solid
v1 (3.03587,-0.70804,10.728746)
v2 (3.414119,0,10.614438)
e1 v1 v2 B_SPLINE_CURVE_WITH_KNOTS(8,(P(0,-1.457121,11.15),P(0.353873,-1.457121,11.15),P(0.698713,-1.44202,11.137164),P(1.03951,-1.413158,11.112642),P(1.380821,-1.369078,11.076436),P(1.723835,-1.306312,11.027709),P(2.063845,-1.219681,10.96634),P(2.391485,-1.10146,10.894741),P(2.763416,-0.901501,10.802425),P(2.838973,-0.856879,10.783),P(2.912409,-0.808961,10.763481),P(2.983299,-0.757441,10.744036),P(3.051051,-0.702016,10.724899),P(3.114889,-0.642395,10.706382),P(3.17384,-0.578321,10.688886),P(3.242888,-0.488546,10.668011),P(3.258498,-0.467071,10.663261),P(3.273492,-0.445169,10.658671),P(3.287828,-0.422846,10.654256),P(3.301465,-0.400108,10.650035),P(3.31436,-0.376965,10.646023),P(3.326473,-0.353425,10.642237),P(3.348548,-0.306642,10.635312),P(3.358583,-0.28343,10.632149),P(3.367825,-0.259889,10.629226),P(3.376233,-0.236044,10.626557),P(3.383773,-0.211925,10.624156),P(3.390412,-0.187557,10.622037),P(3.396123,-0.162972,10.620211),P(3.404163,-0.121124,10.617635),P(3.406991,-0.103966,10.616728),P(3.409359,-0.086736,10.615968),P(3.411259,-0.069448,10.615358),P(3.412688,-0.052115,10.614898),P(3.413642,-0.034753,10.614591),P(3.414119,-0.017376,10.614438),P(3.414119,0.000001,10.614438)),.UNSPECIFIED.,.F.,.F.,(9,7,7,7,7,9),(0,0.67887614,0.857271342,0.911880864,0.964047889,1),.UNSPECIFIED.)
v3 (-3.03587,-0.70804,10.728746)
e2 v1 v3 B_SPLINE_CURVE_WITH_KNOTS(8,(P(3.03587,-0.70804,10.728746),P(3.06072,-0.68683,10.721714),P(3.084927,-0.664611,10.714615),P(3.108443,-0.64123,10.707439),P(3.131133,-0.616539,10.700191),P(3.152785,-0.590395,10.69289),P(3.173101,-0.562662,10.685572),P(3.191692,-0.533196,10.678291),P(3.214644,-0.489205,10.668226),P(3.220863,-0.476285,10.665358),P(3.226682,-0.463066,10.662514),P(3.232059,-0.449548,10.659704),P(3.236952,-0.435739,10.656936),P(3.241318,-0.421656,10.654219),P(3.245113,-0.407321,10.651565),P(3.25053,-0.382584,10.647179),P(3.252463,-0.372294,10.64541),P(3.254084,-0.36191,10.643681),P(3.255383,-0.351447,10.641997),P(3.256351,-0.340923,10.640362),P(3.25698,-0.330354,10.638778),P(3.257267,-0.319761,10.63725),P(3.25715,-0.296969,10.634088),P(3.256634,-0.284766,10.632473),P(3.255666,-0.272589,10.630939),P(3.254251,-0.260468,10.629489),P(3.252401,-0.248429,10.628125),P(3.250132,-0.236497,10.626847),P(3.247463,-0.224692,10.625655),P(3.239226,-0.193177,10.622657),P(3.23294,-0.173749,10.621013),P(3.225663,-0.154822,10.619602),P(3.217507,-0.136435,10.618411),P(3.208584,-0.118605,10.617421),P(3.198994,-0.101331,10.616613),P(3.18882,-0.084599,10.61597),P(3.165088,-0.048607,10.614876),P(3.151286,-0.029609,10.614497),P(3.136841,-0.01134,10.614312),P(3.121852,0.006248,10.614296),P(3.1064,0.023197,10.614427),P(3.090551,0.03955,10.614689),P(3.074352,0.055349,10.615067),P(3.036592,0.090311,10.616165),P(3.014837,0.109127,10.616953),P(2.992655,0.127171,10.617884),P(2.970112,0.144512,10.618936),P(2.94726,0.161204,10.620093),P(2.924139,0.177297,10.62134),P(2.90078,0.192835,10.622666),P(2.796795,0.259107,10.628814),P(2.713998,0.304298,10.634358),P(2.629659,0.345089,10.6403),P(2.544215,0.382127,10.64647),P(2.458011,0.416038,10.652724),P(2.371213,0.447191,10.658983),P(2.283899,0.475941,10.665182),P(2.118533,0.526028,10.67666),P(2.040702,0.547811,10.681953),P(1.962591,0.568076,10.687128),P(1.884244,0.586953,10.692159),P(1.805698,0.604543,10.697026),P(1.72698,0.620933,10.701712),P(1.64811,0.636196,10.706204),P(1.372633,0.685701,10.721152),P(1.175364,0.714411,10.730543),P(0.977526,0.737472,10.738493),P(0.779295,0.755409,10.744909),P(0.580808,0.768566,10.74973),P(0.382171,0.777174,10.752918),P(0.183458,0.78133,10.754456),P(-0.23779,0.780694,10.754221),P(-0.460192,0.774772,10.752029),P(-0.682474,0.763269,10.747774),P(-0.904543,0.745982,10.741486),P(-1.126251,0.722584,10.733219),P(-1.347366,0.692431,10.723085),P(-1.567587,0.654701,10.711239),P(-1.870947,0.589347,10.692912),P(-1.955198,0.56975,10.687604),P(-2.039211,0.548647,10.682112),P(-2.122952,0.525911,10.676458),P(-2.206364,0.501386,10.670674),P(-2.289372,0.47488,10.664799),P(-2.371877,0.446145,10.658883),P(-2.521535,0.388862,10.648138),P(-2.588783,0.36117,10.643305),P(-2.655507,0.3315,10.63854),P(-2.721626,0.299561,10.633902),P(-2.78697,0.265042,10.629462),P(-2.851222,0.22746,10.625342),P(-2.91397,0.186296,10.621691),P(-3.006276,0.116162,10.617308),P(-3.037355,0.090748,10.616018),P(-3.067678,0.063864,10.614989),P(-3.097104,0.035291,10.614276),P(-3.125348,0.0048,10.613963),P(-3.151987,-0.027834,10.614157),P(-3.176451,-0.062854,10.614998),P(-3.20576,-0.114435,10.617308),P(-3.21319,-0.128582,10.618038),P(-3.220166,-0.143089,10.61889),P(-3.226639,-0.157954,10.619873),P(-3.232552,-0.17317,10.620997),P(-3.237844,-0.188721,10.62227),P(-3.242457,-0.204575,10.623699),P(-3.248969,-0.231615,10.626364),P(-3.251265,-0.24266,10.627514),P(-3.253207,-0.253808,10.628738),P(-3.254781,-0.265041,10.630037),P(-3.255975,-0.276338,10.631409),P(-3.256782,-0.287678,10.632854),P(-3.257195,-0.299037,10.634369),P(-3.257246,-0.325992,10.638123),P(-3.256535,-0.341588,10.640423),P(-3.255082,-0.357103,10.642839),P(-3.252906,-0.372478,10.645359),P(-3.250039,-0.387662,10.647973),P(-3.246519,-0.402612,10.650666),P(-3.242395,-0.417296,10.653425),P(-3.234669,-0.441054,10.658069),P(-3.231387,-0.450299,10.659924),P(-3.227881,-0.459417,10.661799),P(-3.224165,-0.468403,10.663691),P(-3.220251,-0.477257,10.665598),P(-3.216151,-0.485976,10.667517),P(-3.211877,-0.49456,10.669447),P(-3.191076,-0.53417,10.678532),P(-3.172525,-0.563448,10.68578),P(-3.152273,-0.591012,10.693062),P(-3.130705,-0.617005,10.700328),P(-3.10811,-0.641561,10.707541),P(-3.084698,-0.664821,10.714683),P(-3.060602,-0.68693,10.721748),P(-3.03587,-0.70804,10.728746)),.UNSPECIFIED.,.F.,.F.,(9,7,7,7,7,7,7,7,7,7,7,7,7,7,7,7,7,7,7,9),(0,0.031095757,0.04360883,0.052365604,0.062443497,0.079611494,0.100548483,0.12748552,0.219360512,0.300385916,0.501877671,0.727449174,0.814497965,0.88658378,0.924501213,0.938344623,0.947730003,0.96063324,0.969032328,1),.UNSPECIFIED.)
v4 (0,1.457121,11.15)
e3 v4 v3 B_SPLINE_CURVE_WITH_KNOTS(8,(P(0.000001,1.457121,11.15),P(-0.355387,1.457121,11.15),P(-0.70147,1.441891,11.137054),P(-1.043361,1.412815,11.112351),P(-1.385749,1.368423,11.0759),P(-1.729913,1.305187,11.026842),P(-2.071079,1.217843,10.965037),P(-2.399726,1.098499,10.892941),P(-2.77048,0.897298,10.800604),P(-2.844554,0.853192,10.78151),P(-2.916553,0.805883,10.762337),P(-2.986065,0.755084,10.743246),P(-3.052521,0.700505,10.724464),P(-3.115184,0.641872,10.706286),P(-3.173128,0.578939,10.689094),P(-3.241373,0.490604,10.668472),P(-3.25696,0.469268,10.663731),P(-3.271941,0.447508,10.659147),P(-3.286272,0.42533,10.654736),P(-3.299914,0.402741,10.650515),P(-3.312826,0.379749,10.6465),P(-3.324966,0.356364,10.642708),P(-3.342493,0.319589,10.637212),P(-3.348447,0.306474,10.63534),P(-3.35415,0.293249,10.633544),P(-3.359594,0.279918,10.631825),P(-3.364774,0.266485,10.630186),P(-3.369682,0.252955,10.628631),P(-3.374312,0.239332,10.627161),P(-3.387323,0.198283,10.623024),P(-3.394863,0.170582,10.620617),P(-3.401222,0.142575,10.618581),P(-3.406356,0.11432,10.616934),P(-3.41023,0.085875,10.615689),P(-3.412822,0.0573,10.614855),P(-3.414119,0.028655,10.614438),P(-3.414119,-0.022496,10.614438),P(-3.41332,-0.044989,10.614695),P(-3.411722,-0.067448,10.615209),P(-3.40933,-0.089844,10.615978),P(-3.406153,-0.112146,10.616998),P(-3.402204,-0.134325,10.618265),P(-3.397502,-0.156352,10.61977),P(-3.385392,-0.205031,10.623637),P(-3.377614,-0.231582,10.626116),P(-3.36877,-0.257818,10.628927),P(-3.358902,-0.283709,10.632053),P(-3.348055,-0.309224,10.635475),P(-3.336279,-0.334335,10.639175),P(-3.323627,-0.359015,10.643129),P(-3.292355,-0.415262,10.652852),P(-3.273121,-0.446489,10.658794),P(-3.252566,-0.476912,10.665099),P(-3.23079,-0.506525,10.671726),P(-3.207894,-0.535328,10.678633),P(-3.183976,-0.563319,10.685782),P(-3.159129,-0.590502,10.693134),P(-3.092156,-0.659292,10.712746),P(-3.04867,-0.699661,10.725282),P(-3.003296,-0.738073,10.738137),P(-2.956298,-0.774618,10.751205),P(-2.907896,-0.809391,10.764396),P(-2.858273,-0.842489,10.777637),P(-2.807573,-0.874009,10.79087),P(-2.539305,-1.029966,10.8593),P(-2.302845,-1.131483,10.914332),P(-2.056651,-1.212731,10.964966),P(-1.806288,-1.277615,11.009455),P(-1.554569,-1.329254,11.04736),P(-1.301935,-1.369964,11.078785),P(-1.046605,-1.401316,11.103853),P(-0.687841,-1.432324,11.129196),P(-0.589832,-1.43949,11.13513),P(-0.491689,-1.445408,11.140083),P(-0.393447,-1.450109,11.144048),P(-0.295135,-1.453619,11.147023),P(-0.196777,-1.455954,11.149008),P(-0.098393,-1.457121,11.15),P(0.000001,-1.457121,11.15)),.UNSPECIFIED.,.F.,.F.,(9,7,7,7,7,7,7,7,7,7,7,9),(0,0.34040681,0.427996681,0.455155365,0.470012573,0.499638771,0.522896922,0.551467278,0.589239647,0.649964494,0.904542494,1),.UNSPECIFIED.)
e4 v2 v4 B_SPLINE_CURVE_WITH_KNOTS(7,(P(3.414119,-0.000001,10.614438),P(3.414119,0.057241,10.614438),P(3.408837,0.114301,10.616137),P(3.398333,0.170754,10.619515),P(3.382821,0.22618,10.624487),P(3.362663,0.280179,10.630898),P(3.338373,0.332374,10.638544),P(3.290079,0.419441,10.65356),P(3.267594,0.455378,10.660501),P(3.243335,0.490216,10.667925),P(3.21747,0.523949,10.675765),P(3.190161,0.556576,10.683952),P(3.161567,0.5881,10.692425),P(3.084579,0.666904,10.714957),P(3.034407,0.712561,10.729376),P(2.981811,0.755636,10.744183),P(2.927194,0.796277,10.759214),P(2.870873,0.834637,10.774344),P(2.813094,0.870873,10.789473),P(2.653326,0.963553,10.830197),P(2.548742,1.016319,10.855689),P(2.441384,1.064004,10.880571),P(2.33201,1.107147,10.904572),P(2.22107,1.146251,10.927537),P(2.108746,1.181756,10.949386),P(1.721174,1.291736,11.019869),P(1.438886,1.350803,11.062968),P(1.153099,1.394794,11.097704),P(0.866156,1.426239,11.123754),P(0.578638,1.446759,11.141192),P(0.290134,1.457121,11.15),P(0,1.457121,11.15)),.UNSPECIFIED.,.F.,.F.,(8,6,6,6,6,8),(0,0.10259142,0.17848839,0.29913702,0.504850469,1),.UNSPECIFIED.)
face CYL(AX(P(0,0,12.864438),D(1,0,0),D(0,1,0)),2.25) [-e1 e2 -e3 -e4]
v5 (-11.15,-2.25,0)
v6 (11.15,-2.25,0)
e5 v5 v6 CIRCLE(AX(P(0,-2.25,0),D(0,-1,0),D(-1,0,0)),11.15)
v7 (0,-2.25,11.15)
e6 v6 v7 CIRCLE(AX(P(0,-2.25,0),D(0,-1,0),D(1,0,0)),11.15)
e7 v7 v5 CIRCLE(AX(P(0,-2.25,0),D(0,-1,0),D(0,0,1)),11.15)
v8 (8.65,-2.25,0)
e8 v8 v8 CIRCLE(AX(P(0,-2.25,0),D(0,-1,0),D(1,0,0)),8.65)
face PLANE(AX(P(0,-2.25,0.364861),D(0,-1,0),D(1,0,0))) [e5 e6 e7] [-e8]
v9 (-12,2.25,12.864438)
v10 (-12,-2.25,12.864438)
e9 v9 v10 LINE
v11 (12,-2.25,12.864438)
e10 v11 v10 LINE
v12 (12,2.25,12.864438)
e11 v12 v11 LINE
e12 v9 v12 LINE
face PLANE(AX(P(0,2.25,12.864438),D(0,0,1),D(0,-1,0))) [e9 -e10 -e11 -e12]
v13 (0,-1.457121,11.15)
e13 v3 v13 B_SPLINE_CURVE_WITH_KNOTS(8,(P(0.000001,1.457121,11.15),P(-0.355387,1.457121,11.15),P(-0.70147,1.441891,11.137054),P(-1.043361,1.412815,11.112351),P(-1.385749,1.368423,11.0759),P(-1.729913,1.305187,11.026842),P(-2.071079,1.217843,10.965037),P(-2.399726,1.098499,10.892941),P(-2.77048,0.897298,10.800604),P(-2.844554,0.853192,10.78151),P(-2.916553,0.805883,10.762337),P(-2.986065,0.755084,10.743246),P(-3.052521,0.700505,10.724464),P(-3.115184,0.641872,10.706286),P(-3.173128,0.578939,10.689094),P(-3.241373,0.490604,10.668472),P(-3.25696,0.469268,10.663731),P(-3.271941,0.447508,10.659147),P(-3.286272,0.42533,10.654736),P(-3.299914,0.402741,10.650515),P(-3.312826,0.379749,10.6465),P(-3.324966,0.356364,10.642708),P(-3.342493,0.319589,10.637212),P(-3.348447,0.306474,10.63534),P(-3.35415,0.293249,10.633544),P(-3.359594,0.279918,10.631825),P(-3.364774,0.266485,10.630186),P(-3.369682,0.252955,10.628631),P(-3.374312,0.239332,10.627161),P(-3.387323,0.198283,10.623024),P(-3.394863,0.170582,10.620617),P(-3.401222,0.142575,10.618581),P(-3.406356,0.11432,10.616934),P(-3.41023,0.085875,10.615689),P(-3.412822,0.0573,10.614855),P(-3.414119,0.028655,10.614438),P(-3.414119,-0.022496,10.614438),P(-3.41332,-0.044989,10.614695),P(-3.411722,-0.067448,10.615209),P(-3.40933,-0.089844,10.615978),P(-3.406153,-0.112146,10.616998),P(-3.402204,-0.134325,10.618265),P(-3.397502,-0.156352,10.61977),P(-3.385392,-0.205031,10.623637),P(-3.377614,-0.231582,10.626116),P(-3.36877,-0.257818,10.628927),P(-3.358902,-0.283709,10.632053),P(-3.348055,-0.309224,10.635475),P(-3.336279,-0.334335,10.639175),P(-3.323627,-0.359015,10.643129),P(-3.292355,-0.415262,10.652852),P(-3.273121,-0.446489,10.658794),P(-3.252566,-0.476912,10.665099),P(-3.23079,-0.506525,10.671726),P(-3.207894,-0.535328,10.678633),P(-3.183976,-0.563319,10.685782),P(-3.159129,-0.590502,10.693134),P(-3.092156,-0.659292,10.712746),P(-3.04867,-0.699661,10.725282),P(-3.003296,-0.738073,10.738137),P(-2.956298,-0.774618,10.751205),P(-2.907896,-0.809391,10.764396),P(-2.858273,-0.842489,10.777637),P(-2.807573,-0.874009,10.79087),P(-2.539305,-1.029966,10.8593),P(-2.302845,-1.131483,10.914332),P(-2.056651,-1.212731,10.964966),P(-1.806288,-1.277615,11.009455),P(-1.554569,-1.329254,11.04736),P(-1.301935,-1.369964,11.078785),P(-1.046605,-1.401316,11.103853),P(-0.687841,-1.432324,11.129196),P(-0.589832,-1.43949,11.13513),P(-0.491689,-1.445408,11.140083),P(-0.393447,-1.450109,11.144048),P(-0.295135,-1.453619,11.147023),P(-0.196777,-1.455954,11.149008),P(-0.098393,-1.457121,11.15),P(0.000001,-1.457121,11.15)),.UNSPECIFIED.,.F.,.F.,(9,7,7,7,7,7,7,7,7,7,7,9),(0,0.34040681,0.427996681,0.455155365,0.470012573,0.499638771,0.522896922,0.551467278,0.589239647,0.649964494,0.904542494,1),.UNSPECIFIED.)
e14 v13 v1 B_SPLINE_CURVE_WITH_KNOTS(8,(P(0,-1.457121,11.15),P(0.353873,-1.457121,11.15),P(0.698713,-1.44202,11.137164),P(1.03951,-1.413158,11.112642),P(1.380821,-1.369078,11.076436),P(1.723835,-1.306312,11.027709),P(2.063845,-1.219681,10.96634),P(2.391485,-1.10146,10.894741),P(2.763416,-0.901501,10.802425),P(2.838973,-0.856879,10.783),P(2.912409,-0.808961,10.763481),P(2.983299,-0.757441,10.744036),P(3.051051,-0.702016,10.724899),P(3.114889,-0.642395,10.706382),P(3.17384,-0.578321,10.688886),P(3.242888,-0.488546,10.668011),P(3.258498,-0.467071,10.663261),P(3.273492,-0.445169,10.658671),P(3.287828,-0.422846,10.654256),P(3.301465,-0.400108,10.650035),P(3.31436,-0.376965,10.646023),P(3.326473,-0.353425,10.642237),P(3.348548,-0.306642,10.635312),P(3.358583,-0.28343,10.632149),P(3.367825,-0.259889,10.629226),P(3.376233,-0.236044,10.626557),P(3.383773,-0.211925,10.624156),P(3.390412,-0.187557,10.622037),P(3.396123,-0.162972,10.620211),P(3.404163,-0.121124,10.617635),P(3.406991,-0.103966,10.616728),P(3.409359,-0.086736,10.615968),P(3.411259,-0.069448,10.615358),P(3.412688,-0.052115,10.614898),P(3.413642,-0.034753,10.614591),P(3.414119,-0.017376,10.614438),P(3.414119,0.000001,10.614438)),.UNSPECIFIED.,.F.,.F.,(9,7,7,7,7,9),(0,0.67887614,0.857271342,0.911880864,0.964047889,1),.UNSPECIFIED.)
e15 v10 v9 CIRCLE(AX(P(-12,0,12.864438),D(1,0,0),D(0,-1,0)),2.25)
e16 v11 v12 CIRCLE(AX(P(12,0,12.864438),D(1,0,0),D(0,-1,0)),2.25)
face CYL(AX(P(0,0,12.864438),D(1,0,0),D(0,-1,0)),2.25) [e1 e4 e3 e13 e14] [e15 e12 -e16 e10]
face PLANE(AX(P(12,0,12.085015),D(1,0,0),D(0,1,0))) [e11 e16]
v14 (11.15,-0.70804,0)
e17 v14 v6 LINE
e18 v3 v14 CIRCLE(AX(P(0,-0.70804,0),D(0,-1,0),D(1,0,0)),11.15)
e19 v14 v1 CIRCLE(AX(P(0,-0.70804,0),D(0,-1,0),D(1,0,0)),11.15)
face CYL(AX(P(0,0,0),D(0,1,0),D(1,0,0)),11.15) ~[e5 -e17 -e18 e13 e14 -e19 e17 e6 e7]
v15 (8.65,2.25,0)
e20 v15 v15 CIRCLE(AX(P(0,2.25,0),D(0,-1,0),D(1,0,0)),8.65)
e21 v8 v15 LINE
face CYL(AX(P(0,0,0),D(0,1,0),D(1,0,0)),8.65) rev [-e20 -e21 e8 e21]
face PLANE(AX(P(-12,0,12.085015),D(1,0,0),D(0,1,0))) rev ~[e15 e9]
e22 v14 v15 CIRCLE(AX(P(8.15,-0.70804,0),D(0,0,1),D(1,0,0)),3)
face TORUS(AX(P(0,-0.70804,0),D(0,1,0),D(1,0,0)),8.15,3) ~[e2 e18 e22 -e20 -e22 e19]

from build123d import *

# Parameters (mm, degrees)
F0_R          = 8.65
F1_DEPTH      = 2.25
F1_DEPTH_BACK = 2.25
F3_DEPTH      = 12
F3_DEPTH_BACK = 12
F4_S5_R       = 2.25
F4_T6_DEPTH   = 19


# Not quite as in the source:
# - a fillet or chamfer that OpenCascade refuses, or shapes differently, is made with other operations: its cross-section is extruded or revolved along the edge and cut away or added
# - a feature names something its author has since deleted; it is built from what else it names


with BuildPart() as f1:
    # F0 (on Front) → F1 (new body, two sides)
    with BuildSketch(Plane.XZ) as f1_sk:
        with BuildLine():
            ThreePointArc((-11.15, 0), (0, -11.15), (11.15, 0))
            ThreePointArc((11.15, 0), (7.8842406102, 7.8842406102), (0, 11.15))
            ThreePointArc((0, 11.15), (-7.8842406102, 7.8842406102), (-11.15, 0))
        make_face()
        Circle(F0_R, mode=Mode.SUBTRACT)
    extrude(amount=F1_DEPTH)
    extrude(f1_sk.sketch, amount=-F1_DEPTH_BACK)

    # F2 (on Right) → F3 (join, two sides)
    with BuildSketch(Plane.YZ) as f3_sk:
        with BuildLine():
            ThreePointArc((-2.25, 12.8644379824), (0, 10.6144379824), (2.25, 12.8644379824))
            Line((2.25, 12.8644379824), (0, 12.8644379824))
            Line((0, 12.8644379824), (-2.25, 12.8644379824))
        make_face()
    extrude(amount=F3_DEPTH)
    extrude(f3_sk.sketch, amount=-F3_DEPTH_BACK)

    # F4: fillet of radius 3 on 1 edges, made by hand


with BuildPart() as f4_tool2:
    # F4_s3 → F4_t4 (revolve)
    with BuildSketch(Plane.XY):
        with BuildLine():
            ThreePointArc((11.15, -0.7080398916), (10.4412878475, 1.2284517816), (8.65, 2.25))
            Line((8.65, 2.25), (11.15, 2.25))
            Line((11.15, 2.25), (11.15, -0.7080398916))
        make_face()
    revolve(axis=Axis((0, 2.25, 0), (0, -1, 0)))

    # F4_s5 → F4_t6 (cut, symmetric)
    with BuildSketch(Plane.YZ):
        with Locations((0, 12.8644379824)):
            Circle(F4_S5_R)
    extrude(amount=F4_T6_DEPTH, both=True, mode=Mode.SUBTRACT)


with BuildPart() as f1_1:
    add(f1.part)

    # F4_t1: cut F4_tool2
    add(f4_tool2.part, mode=Mode.SUBTRACT)


solid = f1_1.part
